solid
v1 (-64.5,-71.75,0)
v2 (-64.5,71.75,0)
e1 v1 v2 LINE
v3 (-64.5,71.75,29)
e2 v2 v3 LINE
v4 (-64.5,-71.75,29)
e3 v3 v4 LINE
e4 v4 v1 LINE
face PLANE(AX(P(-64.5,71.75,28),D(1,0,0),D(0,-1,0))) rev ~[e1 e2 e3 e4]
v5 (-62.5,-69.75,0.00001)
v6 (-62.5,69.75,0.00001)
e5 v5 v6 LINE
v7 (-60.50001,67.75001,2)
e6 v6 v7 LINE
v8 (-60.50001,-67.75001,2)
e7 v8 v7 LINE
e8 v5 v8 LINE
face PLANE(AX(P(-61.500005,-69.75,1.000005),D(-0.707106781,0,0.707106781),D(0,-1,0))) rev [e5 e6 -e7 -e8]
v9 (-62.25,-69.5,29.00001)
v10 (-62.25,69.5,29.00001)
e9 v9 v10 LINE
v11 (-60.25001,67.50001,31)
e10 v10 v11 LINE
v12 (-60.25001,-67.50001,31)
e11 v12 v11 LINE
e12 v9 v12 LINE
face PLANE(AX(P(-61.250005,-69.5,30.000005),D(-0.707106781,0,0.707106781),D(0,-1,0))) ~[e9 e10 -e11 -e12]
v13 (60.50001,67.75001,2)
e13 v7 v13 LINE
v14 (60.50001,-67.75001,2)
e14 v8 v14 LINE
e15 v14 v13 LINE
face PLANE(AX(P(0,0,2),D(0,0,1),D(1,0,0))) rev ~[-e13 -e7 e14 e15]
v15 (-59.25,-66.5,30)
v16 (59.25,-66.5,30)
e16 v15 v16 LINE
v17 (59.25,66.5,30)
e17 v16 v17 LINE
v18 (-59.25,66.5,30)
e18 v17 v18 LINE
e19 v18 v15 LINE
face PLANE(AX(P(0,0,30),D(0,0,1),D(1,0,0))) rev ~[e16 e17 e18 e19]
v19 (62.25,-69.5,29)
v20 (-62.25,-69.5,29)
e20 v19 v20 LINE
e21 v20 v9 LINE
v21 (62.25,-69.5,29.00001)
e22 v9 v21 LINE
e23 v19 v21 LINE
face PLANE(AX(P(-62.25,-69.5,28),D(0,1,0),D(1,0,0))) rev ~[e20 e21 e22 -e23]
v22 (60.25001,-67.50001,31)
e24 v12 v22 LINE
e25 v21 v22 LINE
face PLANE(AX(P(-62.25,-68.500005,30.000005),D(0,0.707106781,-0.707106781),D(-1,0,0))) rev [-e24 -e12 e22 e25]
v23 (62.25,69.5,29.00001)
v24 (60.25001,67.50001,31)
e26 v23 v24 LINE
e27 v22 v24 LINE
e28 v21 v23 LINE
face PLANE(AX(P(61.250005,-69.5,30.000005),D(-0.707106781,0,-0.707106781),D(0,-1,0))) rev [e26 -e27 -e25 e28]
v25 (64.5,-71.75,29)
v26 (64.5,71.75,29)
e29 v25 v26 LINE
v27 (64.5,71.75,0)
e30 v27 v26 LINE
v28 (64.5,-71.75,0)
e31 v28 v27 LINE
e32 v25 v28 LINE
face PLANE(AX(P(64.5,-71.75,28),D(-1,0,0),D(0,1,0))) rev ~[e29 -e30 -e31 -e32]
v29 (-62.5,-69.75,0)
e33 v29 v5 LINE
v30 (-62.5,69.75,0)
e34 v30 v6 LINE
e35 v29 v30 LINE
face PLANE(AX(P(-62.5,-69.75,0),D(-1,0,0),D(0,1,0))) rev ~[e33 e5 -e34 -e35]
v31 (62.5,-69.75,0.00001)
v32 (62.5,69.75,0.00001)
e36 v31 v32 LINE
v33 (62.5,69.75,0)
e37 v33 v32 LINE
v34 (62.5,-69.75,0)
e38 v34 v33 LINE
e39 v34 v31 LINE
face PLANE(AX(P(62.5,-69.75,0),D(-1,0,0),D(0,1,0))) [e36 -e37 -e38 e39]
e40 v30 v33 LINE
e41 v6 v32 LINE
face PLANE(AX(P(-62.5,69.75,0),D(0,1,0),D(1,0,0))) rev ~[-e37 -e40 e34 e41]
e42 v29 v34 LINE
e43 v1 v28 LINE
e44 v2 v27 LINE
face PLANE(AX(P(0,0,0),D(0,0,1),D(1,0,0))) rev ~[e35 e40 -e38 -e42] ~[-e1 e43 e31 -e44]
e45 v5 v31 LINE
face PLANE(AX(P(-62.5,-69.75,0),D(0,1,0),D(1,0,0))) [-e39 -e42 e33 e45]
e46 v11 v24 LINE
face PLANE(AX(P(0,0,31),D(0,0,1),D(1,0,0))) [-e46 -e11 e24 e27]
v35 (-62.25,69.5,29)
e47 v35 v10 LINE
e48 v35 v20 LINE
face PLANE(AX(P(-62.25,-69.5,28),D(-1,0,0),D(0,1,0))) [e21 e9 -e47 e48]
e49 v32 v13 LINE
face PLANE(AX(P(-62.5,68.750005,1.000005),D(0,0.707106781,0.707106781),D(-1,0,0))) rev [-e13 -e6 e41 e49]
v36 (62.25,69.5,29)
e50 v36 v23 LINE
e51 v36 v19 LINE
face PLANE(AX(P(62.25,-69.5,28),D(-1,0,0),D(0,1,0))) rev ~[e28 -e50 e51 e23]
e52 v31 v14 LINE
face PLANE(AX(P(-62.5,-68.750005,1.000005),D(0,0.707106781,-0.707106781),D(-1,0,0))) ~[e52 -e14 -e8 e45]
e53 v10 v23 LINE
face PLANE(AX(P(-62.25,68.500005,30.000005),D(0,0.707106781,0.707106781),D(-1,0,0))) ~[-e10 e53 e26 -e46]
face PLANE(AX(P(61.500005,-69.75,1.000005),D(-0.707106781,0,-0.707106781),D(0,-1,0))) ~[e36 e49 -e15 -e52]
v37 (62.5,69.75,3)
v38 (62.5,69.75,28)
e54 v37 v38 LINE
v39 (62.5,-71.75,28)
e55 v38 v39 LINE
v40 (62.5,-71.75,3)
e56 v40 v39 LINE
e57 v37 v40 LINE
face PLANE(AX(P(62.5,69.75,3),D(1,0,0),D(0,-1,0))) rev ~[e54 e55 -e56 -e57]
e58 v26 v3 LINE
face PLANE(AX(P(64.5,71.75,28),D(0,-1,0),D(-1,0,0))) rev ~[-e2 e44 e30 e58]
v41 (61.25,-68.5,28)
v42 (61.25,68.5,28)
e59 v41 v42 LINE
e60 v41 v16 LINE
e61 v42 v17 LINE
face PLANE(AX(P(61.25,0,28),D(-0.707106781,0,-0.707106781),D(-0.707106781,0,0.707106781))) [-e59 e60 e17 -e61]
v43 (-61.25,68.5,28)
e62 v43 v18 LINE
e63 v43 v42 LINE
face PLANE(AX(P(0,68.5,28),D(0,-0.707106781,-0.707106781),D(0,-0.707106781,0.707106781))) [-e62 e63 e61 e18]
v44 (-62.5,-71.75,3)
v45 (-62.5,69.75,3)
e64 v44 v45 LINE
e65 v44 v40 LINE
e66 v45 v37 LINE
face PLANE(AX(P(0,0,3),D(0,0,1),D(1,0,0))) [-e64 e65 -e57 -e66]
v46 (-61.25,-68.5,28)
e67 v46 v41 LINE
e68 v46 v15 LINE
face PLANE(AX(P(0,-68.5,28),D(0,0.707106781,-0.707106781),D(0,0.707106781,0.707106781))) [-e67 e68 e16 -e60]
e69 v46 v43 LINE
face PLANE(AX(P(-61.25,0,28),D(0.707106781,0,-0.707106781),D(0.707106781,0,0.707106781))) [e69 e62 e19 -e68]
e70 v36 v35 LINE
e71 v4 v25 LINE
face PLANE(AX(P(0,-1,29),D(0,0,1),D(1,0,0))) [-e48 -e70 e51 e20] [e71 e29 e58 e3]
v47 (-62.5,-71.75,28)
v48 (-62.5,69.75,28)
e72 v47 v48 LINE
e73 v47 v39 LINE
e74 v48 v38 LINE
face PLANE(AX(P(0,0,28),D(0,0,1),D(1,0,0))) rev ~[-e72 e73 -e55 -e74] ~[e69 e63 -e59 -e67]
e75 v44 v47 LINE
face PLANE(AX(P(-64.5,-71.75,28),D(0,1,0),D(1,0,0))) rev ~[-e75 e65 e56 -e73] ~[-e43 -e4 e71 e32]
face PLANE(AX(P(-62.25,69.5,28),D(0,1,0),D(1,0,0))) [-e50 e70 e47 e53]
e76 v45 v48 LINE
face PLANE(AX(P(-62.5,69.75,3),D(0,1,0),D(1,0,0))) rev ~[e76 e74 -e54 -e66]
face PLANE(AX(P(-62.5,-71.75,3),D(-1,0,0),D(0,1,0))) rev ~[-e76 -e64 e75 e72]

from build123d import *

# Parameters (mm, degrees)
F0_W      = 129
F0_H      = 143.5
F0_W_2    = 125
F0_H_2    = 139.5
F1_DEPTH  = 3
F2_DEPTH  = 2
F3_SIZE   = 1.99999
F5_DEPTH  = 25
F6_W      = 125
F6_H      = 141.5
F6_W_2    = 124.5
F6_H_2    = 139
F6_W_3    = 122.5
F6_H_3    = 137
F7_DEPTH  = 1
F8_DEPTH  = 3
F9_SIZE   = 1.99999
F10_DEPTH = 2
F10_TAPER = 45


# Not quite as in the source:
# - a fillet or chamfer is up to 0.001 mm smaller than in the source, because OpenCascade refuses the exact size
# - a feature names something its author has since deleted; it is built from what else it names


with BuildPart() as f1:
    # F0 (on Top) → F1 (new body)
    with BuildSketch(Plane.XY):
        Rectangle(F0_W, F0_H)
        Rectangle(F0_W_2, F0_H_2, mode=Mode.SUBTRACT)
        Rectangle(F0_W_2, F0_H_2)
    extrude(amount=F1_DEPTH)

    # F0 (on Top) → F2 (cut)
    with BuildSketch(Plane.XY):
        Rectangle(F0_W_2, F0_H_2)
    extrude(amount=F2_DEPTH, mode=Mode.SUBTRACT)

    # F3 (size 2 in the source; OpenCascade refuses exactly that, so slightly less here)
    f3_edges = [f1.edges().sort_by_distance(p)[0] for p in [
        (0, -69.75, 2),
        (62.5, 0, 2),
        (0, 69.75, 2),
        (-62.5, 0, 2),
    ]]
    chamfer(f3_edges, length=F3_SIZE)

    # F4 (on face) → F5 (join)
    with BuildSketch(Plane.XY.offset(3)):
        Polygon((-64.5, 71.75), (-64.5, -71.75), (-62.5, -71.75), (-62.5, 69.75), (62.5, 69.75), (62.5, -71.75), (64.5, -71.75), (64.5, 71.75), align=None)
    extrude(amount=F5_DEPTH)

    # F6 (on face) → F7 (join)
    with BuildSketch(Plane.XY.offset(28)):
        with Locations((0, -1)):
            Rectangle(F6_W, F6_H)
        Rectangle(F6_W_2, F6_H_2, mode=Mode.SUBTRACT)
        Rectangle(F6_W_2, F6_H_2)
        Rectangle(F6_W_3, F6_H_3, mode=Mode.SUBTRACT)
        Rectangle(F6_W_3, F6_H_3)
        Polygon((-64.5, 71.75), (-64.5, -71.75), (-62.5, -71.75), (-62.5, 69.75), (62.5, 69.75), (62.5, -71.75), (64.5, -71.75), (64.5, 71.75), align=None)
    extrude(amount=F7_DEPTH)

    # F6 (on face) → F8 (join)
    with BuildSketch(Plane.XY.offset(28)):
        Rectangle(F6_W_2, F6_H_2)
        Rectangle(F6_W_3, F6_H_3, mode=Mode.SUBTRACT)
        Rectangle(F6_W_3, F6_H_3)
    extrude(amount=F8_DEPTH)

    # F9 (size 2 in the source; OpenCascade refuses exactly that, so slightly less here)
    f9_edges = [f1.edges().sort_by_distance(p)[0] for p in [
        (-62.25, 0, 31),
        (0, 69.5, 31),
        (0, -69.5, 31),
        (62.25, 0, 31),
    ]]
    chamfer(f9_edges, length=F9_SIZE)

    # F6 (on face) → F10 (cut)
    with BuildSketch(Plane.XY.offset(28)):
        Rectangle(F6_W_3, F6_H_3)
    extrude(amount=F10_DEPTH, taper=F10_TAPER, mode=Mode.SUBTRACT)


solid = f1.part
